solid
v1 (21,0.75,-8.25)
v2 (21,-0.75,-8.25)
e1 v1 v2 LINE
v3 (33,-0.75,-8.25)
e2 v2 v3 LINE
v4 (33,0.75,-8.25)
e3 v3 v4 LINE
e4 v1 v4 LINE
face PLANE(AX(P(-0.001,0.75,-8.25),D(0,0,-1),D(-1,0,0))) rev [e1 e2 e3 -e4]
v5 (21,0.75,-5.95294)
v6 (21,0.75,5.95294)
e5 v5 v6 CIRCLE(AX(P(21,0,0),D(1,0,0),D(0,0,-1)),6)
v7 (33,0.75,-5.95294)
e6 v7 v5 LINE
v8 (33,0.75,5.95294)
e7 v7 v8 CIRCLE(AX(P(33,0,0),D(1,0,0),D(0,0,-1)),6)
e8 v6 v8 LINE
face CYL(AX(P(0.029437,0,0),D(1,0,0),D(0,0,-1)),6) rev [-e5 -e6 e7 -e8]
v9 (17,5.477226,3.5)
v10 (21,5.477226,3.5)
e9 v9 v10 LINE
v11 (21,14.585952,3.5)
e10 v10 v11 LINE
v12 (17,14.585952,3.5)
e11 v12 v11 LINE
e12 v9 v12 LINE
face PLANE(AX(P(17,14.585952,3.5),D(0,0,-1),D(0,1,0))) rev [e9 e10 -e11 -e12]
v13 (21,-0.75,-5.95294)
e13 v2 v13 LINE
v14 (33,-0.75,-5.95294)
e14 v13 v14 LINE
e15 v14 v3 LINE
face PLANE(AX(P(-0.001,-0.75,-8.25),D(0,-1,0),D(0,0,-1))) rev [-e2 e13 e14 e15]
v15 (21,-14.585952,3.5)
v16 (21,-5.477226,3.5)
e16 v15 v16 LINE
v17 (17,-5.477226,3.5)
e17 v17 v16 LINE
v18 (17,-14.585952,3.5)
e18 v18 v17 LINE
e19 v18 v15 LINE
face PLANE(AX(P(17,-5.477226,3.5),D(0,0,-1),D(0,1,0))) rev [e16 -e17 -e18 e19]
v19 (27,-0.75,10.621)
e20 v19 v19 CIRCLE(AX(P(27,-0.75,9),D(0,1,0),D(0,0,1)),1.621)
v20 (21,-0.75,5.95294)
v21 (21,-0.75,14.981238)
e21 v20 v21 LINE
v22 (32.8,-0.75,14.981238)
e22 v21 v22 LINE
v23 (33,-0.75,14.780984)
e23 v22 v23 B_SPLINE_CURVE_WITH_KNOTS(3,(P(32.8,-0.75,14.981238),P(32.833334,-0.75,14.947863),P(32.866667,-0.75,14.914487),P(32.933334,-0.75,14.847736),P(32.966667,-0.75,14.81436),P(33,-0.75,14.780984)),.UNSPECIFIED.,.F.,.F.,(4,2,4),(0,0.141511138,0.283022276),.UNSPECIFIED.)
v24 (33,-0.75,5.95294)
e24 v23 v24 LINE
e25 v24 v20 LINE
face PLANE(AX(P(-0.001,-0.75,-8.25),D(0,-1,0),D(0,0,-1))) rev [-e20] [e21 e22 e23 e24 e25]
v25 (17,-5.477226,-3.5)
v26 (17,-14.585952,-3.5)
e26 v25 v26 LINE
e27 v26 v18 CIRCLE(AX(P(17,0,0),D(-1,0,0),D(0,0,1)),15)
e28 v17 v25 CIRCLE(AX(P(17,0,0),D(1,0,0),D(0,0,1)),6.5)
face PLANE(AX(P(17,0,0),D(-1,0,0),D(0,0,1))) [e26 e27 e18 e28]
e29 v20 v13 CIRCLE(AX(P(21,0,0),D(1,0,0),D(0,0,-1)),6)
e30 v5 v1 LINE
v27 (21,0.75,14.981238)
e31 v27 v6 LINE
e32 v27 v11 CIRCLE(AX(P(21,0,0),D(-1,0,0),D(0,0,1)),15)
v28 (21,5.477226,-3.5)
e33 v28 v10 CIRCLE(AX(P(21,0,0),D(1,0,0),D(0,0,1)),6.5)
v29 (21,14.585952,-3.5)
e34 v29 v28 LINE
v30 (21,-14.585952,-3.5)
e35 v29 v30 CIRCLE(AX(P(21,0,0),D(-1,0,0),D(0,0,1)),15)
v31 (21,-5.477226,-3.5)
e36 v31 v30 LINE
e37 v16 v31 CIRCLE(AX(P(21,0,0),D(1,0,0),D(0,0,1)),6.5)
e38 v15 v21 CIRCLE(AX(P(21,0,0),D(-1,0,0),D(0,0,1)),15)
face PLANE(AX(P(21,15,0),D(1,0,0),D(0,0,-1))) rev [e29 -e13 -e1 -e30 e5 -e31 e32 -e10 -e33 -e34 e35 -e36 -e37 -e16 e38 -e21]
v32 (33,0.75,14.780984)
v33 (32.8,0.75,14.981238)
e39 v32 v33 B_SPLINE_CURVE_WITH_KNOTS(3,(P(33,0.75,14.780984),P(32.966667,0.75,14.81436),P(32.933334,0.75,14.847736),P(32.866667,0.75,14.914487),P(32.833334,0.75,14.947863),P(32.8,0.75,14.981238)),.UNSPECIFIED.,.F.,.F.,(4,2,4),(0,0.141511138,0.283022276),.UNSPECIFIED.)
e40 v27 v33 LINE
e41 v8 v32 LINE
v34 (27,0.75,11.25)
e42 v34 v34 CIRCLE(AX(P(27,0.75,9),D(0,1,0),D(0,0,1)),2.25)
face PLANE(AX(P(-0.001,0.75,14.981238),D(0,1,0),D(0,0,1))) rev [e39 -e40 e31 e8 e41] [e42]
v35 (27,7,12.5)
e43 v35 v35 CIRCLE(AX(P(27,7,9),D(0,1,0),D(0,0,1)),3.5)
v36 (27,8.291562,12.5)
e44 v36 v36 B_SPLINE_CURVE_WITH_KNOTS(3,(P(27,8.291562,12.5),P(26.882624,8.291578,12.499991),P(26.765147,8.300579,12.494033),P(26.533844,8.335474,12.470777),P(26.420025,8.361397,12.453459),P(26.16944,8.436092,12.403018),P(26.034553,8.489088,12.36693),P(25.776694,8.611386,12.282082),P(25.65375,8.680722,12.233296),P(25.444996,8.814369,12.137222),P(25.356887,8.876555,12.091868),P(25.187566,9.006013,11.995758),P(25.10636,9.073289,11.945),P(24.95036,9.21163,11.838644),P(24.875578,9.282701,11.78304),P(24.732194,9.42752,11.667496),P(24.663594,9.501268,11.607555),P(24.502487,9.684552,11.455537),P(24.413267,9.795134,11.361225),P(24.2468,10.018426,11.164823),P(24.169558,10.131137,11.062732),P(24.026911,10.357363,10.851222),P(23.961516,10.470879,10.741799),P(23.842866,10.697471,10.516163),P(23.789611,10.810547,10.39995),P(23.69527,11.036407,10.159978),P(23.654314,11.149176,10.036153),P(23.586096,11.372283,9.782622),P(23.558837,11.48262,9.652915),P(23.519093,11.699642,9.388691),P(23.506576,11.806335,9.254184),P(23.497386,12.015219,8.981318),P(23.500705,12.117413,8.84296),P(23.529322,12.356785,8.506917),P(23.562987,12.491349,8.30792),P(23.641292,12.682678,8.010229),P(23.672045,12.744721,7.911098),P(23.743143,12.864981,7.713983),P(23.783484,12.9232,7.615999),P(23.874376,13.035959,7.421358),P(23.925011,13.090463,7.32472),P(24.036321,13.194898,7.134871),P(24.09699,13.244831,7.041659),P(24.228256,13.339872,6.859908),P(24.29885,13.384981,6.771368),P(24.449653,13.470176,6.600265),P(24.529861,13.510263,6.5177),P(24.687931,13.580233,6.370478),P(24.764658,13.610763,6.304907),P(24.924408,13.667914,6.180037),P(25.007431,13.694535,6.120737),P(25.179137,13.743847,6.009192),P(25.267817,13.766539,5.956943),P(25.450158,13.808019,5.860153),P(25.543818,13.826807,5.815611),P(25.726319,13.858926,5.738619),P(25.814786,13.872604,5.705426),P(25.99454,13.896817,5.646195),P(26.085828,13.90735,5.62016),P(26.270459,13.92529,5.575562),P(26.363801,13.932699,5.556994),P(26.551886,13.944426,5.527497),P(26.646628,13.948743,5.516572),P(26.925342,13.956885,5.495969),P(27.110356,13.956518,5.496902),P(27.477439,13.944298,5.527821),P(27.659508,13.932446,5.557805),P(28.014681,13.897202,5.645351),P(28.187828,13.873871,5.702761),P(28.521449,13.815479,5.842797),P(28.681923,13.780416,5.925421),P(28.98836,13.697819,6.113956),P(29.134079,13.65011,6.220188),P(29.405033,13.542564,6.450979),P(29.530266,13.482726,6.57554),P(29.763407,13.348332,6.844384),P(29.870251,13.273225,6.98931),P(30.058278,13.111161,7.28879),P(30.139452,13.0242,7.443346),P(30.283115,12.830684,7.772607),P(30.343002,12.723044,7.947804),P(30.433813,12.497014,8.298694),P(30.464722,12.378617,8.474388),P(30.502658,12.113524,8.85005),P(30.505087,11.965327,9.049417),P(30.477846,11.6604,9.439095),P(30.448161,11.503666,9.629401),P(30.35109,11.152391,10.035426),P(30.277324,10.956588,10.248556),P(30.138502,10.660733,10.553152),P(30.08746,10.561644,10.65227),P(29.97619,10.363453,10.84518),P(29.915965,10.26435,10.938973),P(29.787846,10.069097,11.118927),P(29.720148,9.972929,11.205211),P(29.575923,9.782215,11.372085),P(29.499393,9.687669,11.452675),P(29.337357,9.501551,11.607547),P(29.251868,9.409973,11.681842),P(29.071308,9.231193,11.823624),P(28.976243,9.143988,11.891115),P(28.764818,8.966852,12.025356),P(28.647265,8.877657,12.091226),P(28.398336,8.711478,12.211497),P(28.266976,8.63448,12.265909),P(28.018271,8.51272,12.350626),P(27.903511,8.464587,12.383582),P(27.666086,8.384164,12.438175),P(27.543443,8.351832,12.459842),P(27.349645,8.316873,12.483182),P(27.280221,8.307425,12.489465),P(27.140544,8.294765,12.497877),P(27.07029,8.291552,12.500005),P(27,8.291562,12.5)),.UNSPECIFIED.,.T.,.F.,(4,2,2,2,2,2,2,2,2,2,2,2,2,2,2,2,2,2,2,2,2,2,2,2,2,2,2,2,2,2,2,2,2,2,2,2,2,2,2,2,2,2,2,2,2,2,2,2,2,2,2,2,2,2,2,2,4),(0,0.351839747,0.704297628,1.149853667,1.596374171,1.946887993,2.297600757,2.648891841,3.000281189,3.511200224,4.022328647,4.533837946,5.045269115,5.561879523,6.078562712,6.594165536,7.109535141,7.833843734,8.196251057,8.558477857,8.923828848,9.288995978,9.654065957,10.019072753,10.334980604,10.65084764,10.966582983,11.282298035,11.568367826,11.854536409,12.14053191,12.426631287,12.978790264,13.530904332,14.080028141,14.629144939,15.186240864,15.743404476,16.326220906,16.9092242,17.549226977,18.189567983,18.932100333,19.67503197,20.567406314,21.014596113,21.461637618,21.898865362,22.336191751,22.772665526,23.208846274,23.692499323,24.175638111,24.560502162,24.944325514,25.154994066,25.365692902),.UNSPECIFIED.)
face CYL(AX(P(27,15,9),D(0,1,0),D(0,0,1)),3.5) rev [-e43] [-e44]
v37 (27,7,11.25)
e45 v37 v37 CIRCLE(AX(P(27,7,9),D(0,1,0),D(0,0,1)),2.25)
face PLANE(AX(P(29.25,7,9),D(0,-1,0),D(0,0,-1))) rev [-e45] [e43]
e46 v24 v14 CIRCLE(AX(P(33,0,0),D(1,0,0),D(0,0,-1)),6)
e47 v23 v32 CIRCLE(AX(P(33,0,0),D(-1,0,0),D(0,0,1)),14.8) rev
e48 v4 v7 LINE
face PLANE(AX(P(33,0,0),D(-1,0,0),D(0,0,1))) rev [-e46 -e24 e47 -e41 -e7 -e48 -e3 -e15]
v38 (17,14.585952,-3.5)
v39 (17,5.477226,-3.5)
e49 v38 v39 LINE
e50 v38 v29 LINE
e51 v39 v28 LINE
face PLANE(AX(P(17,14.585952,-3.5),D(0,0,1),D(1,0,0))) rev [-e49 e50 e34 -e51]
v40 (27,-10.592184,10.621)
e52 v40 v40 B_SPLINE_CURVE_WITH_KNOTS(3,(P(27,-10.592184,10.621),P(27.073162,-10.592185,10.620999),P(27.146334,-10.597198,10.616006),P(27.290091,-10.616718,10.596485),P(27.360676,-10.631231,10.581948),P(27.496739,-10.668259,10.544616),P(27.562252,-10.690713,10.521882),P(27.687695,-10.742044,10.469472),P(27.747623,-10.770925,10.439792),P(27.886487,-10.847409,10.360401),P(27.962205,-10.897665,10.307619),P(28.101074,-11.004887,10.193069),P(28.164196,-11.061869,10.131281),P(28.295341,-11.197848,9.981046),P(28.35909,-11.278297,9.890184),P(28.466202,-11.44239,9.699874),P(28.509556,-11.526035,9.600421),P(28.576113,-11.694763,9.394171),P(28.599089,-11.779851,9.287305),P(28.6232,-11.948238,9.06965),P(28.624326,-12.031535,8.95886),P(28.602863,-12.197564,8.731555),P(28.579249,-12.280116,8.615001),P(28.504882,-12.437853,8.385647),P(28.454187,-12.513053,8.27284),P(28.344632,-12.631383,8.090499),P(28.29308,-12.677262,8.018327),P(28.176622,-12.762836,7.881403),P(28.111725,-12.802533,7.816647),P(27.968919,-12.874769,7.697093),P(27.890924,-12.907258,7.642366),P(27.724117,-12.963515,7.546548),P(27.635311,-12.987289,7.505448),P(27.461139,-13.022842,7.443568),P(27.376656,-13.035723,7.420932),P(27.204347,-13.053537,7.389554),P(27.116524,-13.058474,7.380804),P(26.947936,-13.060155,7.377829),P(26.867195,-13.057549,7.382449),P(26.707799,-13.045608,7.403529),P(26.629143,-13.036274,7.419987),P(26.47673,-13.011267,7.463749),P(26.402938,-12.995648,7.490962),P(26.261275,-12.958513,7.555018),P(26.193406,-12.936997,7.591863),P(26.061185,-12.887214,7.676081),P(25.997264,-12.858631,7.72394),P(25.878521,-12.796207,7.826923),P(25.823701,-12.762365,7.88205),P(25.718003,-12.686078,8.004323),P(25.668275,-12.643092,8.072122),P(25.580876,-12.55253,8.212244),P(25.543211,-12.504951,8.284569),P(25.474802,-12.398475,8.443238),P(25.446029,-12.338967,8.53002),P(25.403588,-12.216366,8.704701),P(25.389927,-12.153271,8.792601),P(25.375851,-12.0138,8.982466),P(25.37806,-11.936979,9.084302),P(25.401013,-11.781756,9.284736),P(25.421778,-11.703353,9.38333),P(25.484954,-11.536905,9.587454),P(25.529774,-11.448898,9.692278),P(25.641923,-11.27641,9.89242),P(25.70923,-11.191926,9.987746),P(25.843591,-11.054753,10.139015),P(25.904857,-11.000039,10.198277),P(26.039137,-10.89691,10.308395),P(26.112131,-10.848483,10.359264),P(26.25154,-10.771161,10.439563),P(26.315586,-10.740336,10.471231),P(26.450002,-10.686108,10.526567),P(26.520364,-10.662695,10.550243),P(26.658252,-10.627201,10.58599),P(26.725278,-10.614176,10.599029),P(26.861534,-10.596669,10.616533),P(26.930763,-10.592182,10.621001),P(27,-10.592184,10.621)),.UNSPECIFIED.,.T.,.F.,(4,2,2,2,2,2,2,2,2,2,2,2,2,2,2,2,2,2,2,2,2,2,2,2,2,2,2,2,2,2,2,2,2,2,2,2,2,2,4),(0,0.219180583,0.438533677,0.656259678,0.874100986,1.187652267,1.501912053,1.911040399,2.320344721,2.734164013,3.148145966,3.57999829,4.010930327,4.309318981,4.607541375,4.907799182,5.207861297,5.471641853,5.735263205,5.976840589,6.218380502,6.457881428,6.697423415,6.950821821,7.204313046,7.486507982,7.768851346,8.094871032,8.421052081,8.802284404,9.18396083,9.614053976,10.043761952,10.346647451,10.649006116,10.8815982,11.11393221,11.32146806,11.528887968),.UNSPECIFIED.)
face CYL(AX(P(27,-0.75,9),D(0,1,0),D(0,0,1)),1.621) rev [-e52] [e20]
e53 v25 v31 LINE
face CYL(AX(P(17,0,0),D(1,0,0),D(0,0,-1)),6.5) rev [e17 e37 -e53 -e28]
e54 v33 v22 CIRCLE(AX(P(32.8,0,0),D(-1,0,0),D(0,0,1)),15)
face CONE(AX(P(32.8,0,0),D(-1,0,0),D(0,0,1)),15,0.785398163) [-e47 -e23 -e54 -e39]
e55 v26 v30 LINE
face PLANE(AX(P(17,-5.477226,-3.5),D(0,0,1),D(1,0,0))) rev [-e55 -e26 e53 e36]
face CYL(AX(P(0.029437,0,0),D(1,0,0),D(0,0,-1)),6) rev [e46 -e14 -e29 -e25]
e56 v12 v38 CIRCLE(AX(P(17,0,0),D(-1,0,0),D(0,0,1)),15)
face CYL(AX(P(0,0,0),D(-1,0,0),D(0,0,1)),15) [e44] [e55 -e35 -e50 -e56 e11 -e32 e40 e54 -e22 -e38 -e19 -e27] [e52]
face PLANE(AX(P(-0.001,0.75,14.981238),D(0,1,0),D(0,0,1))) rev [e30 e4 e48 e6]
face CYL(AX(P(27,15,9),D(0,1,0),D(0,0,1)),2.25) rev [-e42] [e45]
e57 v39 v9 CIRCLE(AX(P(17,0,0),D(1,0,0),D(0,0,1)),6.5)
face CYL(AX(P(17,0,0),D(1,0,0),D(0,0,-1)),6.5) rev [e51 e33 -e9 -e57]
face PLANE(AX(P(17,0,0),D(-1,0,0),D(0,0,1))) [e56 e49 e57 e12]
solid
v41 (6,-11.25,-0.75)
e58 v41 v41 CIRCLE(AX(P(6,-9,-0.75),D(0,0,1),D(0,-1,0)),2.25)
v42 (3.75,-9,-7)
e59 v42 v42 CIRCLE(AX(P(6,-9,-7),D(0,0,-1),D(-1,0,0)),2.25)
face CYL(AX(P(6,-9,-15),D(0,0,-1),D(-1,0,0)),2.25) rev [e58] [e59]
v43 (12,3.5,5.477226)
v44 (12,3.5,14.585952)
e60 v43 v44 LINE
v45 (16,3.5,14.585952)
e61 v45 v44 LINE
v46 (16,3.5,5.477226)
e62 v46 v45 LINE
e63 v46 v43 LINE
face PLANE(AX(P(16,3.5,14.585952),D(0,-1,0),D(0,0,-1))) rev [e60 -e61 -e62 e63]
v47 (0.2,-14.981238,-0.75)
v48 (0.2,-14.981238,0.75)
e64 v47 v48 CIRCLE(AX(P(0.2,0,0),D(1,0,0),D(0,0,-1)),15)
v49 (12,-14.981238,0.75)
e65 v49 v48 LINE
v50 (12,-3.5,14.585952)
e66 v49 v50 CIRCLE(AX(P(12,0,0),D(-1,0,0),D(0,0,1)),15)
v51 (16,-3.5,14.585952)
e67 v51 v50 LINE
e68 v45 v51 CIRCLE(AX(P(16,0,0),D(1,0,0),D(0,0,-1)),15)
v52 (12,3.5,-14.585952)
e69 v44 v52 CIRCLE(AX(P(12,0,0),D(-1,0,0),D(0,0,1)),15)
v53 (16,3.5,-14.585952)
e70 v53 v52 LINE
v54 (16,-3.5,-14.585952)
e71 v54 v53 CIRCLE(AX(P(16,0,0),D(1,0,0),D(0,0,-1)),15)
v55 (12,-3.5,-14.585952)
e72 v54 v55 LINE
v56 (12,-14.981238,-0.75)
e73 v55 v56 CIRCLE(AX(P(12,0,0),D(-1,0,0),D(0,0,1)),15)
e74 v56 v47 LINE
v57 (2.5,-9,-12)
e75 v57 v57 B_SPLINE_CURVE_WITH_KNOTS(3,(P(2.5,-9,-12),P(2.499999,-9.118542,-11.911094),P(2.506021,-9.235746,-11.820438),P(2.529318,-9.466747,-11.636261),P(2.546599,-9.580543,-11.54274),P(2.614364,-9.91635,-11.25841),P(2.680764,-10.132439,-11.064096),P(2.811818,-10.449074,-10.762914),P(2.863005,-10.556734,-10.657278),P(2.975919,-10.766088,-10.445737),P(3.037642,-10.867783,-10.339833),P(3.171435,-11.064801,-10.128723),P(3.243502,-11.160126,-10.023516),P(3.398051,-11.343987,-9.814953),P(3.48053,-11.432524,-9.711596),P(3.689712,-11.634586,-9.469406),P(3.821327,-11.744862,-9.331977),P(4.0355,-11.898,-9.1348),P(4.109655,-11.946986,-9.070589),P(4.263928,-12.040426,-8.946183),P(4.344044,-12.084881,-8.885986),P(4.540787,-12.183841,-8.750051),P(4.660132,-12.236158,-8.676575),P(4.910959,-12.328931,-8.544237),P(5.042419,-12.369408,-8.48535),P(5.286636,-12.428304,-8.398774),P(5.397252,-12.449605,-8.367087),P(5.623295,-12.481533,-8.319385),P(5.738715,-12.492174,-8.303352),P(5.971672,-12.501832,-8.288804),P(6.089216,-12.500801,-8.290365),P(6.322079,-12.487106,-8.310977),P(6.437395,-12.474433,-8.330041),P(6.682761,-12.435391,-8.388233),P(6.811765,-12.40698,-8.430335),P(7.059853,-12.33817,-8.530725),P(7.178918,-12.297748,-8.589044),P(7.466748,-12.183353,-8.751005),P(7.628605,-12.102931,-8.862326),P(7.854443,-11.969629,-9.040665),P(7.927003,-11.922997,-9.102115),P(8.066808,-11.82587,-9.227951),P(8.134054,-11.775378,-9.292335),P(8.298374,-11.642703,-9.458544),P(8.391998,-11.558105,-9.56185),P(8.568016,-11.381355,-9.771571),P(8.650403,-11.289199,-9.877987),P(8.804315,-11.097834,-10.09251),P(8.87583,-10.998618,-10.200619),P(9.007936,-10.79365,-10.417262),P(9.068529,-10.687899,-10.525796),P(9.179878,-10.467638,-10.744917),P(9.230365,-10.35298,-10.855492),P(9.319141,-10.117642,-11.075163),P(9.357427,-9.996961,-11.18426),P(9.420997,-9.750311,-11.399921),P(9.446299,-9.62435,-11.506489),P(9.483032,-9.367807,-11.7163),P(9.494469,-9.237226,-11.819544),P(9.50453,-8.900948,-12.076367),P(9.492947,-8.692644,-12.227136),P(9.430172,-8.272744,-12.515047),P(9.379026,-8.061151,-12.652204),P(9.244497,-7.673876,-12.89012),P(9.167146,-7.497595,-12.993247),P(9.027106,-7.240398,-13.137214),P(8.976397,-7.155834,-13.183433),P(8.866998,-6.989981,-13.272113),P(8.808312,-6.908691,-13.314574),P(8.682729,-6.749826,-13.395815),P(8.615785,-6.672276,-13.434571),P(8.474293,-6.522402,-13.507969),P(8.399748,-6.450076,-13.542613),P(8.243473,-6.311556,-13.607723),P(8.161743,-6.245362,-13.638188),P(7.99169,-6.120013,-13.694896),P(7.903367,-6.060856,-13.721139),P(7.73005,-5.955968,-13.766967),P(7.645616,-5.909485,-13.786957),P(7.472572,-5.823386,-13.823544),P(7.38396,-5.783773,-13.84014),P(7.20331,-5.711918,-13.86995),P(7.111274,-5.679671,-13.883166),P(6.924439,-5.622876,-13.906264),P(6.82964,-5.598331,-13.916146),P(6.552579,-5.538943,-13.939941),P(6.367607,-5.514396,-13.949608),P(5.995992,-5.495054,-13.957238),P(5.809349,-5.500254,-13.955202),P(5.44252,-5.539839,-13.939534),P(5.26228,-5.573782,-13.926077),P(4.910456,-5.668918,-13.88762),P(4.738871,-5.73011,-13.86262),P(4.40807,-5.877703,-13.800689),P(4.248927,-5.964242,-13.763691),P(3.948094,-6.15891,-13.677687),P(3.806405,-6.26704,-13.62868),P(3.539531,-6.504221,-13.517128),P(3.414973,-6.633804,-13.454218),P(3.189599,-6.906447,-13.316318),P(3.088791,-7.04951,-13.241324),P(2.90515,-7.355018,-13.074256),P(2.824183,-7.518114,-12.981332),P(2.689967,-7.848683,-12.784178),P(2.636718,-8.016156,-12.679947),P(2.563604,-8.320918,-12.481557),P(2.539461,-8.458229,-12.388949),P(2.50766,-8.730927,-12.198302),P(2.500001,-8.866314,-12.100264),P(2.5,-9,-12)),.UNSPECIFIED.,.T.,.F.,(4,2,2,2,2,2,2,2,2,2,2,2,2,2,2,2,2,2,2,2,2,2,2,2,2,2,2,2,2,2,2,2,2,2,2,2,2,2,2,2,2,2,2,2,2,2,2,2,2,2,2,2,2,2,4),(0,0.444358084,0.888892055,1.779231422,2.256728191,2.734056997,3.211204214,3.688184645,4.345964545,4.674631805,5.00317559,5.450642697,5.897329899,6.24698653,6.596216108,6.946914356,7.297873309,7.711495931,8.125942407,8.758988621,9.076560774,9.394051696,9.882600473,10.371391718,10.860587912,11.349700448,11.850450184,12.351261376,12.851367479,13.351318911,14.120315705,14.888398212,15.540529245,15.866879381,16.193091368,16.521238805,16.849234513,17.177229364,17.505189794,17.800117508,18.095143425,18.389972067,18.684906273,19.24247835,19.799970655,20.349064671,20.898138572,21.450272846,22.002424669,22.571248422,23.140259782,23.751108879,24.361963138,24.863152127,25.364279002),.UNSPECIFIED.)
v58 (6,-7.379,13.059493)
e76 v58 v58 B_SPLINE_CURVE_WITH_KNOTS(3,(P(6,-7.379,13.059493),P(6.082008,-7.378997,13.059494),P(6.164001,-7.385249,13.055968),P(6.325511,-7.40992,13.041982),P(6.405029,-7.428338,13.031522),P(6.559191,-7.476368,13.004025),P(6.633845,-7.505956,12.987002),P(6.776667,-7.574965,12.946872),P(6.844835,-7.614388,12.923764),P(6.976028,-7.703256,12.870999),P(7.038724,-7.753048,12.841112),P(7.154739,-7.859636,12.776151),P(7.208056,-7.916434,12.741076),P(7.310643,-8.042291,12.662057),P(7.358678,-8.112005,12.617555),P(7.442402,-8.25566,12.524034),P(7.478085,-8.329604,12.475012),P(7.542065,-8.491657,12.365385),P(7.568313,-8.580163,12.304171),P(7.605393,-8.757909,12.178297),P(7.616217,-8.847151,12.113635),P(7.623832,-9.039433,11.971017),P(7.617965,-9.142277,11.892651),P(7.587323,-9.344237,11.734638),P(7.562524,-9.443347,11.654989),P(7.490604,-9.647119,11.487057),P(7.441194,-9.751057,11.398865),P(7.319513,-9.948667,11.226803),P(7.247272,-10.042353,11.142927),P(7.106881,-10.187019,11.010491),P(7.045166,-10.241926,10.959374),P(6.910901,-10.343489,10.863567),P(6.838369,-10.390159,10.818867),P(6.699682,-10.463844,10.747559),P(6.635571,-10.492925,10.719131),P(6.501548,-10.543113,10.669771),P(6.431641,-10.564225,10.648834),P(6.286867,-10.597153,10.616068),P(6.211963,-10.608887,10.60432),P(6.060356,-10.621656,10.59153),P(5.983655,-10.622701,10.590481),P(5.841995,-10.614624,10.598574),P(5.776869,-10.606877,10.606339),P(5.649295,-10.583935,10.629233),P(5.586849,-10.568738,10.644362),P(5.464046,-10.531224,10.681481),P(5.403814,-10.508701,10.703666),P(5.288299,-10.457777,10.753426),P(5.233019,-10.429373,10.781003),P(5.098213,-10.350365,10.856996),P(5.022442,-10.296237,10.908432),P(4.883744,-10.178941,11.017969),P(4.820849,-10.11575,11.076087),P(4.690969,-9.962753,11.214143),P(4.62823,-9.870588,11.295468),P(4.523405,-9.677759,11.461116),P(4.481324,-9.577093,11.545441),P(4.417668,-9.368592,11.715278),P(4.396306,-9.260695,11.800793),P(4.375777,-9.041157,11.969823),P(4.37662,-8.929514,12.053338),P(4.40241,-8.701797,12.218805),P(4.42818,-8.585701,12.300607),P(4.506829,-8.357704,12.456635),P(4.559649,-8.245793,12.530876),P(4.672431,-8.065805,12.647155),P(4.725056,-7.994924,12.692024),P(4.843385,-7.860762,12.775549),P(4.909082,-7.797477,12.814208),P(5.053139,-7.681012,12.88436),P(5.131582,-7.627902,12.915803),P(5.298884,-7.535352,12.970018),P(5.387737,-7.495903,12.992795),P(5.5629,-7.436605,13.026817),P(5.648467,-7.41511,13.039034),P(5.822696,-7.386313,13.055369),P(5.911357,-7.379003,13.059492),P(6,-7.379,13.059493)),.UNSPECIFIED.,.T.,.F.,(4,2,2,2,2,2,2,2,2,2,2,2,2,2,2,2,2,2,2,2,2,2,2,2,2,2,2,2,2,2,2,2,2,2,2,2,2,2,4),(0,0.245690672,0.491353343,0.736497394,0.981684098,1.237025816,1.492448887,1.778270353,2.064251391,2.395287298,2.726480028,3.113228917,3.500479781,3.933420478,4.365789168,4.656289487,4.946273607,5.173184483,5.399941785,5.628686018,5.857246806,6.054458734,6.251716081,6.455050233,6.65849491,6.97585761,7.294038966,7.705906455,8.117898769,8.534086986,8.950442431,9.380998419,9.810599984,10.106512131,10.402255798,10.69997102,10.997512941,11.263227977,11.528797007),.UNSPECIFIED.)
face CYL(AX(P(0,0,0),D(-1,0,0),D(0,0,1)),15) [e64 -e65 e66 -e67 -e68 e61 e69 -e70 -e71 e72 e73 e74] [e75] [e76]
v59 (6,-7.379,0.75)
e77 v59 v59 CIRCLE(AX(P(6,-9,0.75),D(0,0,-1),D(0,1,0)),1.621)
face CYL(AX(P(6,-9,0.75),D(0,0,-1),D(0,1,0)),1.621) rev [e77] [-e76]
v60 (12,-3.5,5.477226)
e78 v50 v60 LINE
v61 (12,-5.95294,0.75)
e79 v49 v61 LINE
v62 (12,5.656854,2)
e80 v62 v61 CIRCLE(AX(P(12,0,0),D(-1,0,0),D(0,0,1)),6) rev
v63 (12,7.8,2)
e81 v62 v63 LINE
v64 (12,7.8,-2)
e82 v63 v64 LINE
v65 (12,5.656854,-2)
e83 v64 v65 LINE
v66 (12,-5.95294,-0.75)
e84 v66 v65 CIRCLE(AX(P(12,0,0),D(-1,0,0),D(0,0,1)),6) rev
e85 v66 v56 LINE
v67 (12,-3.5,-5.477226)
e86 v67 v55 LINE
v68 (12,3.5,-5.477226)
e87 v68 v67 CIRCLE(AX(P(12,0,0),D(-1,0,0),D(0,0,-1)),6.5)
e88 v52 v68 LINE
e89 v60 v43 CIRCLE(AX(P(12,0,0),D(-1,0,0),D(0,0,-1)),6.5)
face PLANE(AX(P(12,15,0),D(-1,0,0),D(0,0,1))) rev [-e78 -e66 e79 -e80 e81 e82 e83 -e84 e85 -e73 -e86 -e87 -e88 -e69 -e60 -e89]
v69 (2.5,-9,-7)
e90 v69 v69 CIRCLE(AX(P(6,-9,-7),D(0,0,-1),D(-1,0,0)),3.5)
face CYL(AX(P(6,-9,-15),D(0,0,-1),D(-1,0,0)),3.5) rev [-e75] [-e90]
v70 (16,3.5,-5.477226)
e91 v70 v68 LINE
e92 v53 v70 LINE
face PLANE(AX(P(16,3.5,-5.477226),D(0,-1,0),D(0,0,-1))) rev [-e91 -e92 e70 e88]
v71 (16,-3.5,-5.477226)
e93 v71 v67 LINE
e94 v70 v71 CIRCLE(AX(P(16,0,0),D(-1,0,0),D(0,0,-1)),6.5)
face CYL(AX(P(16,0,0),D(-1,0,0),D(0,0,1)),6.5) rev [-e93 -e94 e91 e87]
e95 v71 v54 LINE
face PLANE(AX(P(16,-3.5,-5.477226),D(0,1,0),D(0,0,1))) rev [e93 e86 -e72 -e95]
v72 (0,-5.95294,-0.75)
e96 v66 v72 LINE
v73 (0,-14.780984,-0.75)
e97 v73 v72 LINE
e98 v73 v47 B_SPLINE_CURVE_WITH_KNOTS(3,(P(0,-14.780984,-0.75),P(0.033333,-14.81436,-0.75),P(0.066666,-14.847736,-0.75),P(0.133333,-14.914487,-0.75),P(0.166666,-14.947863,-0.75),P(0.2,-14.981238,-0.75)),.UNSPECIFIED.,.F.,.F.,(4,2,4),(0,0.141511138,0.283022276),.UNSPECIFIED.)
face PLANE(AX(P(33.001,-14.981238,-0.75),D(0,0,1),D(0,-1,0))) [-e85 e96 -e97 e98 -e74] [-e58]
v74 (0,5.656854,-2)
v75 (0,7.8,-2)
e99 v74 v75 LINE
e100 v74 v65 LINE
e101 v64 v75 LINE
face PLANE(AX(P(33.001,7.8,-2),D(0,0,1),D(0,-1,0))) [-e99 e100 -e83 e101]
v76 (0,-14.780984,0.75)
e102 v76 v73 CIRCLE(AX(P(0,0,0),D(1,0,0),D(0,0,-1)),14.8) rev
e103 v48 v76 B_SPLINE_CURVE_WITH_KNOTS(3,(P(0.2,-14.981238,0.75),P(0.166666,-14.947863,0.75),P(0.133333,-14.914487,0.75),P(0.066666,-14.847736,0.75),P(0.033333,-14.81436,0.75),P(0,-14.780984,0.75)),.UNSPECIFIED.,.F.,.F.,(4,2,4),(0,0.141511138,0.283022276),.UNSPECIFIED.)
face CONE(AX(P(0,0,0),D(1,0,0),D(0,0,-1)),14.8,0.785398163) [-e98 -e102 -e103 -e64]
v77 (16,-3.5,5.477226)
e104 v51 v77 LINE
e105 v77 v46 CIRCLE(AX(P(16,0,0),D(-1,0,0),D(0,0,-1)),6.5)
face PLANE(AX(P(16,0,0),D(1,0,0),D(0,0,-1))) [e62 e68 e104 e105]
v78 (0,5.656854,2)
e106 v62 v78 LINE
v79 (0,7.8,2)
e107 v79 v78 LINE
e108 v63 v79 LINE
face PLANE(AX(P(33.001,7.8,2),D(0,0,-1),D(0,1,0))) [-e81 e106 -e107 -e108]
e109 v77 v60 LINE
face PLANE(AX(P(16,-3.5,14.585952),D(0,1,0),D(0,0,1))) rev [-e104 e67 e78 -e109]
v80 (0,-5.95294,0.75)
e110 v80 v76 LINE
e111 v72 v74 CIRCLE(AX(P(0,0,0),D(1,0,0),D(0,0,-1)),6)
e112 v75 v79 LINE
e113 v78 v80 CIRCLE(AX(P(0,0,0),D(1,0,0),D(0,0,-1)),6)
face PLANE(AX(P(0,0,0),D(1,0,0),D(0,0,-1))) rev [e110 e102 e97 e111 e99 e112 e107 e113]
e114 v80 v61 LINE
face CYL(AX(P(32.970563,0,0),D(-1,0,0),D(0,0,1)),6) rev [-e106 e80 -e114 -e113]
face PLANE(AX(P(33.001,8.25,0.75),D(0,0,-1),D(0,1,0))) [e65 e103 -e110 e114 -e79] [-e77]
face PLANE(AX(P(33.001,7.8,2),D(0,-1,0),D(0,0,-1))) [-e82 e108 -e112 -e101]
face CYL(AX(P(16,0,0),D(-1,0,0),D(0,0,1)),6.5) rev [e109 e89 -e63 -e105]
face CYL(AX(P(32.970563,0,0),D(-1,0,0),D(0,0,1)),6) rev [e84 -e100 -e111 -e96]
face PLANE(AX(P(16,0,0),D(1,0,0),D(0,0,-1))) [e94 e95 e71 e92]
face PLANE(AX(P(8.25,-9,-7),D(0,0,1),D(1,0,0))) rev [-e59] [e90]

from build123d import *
from build123d.topology import SkipClean

# Parameters (mm, degrees)
SKETCH1_W                          = 12
SKETCH1_H                          = 15
BOSS_EXTRUDE1_DEPTH                = 4
BOSS_EXTRUDE2_START                = 4
BOSS_EXTRUDE2_DEPTH                = 4
SKETCH4_R                          = 6
CUT_EXTRUDE1_DEPTH                 = 16
CUT_EXTRUDE2_START                 = -16
SKETCH5_R                          = 6
CUT_EXTRUDE2_DEPTH                 = 16
CUT_EXTRUDE3_DEPTH                 = 12
CUT_EXTRUDE4_START                 = -12
CUT_EXTRUDE4_DEPTH                 = 12
SOCKET_HEAD_CAP_SCREW1_D           = 4.5
SOCKET_HEAD_CAP_SCREW1_DEPTH       = 14.25
SOCKET_HEAD_CAP_SCREW1_CBORE_D     = 7
SOCKET_HEAD_CAP_SCREW1_CBORE_DEPTH = 8
TAP1_D                             = 3.242
SOCKET_HEAD_CAP_SCREW2_D           = 4.5
SOCKET_HEAD_CAP_SCREW2_DEPTH       = 14.25
SOCKET_HEAD_CAP_SCREW2_CBORE_D     = 7
SOCKET_HEAD_CAP_SCREW2_CBORE_DEPTH = 8
TAP2_D                             = 3.242
CHAMFER1_SIZE                      = 0.2
CHAMFER2_SIZE                      = 0.2
DELETEFACE1_DEPTH                  = 12
CUT_EXTRUDE5_REACH                 = 41.23
SKETCH16_W                         = 4
SKETCH16_H                         = 7.8


# Read off the part's stored shape, not the designer's step: DeleteFace1
with BuildPart() as part:
    # Sketch1 → Revolve1 (revolve)
    with BuildSketch(Plane.XY, mode=Mode.PRIVATE) as revolve1_sk:
        with Locations((6, 7.5)):
            Rectangle(SKETCH1_W, SKETCH1_H)
        with Locations((27, 7.5)):
            Rectangle(SKETCH1_W, SKETCH1_H)
    revolve(revolve1_sk.sketch.rotate(Axis((0, 0, 0), (1, 0, 0)), 90), axis=Axis((0, 0, 0), (1, 0, 0)))

    # Sketch2 → Boss-Extrude1 (add)
    with SkipClean():  # the faces are left unmerged after this step: merging them gives an invalid solid
        with BuildSketch(Plane(origin=(12, 0, 0), x_dir=(0, 0, -1), z_dir=(1, 0, 0))):
            with BuildLine():
                Line((-14.585952146, 3.5), (-5.477225575, 3.5))
                ThreePointArc((-5.477225575, 3.5), (-6.5, 0), (-5.477225575, -3.5))
                Line((-5.477225575, -3.5), (-14.585952146, -3.5))
                ThreePointArc((-14.585952146, -3.5), (-15, 0), (-14.585952146, 3.5))
            make_face()
            with BuildLine():
                Line((5.477225575, 3.5), (14.585952146, 3.5))
                ThreePointArc((14.585952146, 3.5), (15, 0), (14.585952146, -3.5))
                Line((14.585952146, -3.5), (5.477225575, -3.5))
                ThreePointArc((5.477225575, -3.5), (6.5, 0), (5.477225575, 3.5))
            make_face()
        extrude(amount=BOSS_EXTRUDE1_DEPTH)

    # Sketch3 → Boss-Extrude2 (add)
    with SkipClean():  # the faces are left unmerged after this step: merging them gives an invalid solid
        with BuildSketch(Plane.ZY.offset(-21).offset(BOSS_EXTRUDE2_START)):
            with BuildLine():
                Line((-3.5, 14.585952146), (-3.5, 5.477225575))
                ThreePointArc((-3.5, 5.477225575), (0, 6.5), (3.5, 5.477225575))
                Line((3.5, 5.477225575), (3.5, 14.585952146))
                ThreePointArc((3.5, 14.585952146), (0, 15), (-3.5, 14.585952146))
            make_face()
            with BuildLine():
                Line((3.5, -5.477225575), (3.5, -14.585952146))
                ThreePointArc((3.5, -14.585952146), (0, -15), (-3.5, -14.585952146))
                Line((-3.5, -14.585952146), (-3.5, -5.477225575))
                ThreePointArc((-3.5, -5.477225575), (0, -6.5), (3.5, -5.477225575))
            make_face()
        extrude(amount=-BOSS_EXTRUDE2_DEPTH)

    # Sketch4 → Cut-Extrude1 (cut)
    with SkipClean():  # the faces are left unmerged after this step: merging them gives an invalid solid
        with BuildSketch(Plane(origin=(0, 0, 0), x_dir=(0, 0, -1), z_dir=(1, 0, 0))):
            with Locations(Location((0, 0, 0), (0, 0, 180))):
                Circle(SKETCH4_R)
        extrude(amount=CUT_EXTRUDE1_DEPTH, mode=Mode.SUBTRACT)

    # Sketch5 → Cut-Extrude2 (cut)
    with SkipClean():  # the faces are left unmerged after this step: merging them gives an invalid solid
        with BuildSketch(Plane(origin=(33, 0, 0), x_dir=(0, 0, -1), z_dir=(1, 0, 0)).offset(CUT_EXTRUDE2_START)):
            Circle(SKETCH5_R)
        extrude(amount=CUT_EXTRUDE2_DEPTH, mode=Mode.SUBTRACT)

    # Sketch6 → Cut-Extrude3 (cut)
    with SkipClean():  # the faces are left unmerged after this step: merging them gives an invalid solid
        with BuildSketch(Plane(origin=(0, 0, 0), x_dir=(0, 0, -1), z_dir=(1, 0, 0))):
            with BuildLine():
                Line((0.75, -14.981238267), (0.75, 8.25))
                Line((0.75, 8.25), (-0.75, 8.25))
                Line((-0.75, 8.25), (-0.75, -14.981238267))
                ThreePointArc((-0.75, -14.981238267), (0, -15), (0.75, -14.981238267))
            make_face()
        extrude(amount=CUT_EXTRUDE3_DEPTH, mode=Mode.SUBTRACT)

    # Sketch7 → Cut-Extrude4 (cut)
    with SkipClean():  # the faces are left unmerged after this step: merging them gives an invalid solid
        with BuildSketch(Plane(origin=(33, 0, 0), x_dir=(0, 0, -1), z_dir=(1, 0, 0)).offset(CUT_EXTRUDE4_START)):
            with BuildLine():
                Line((-14.981238267, 0.75), (8.25, 0.75))
                Line((8.25, 0.75), (8.25, -0.75))
                Line((8.25, -0.75), (-14.981238267, -0.75))
                ThreePointArc((-14.981238267, -0.75), (-15, 0), (-14.981238267, 0.75))
            make_face()
        extrude(amount=CUT_EXTRUDE4_DEPTH, mode=Mode.SUBTRACT)

    # Socket Head Cap Screw1
    with Locations(Plane(origin=(0, 0, -15), x_dir=(1, 0, 0), z_dir=(0, 0, -1))):
        with Locations((6, 9)):
            CounterBoreHole(SOCKET_HEAD_CAP_SCREW1_D / 2, SOCKET_HEAD_CAP_SCREW1_CBORE_D / 2, SOCKET_HEAD_CAP_SCREW1_CBORE_DEPTH, depth=SOCKET_HEAD_CAP_SCREW1_DEPTH)

    # Tap1 (through all)
    with Locations(Plane(origin=(0, 0, 0.75), x_dir=(-1, 0, 0), z_dir=(0, 0, -1))):
        with Locations((-6, -9)):
            Hole(TAP1_D / 2)

    # Socket Head Cap Screw2
    with Locations(Plane(origin=(0, 15, 0), x_dir=(1, 0, 0), z_dir=(0, 1, 0))):
        with Locations((27, -9)):
            CounterBoreHole(SOCKET_HEAD_CAP_SCREW2_D / 2, SOCKET_HEAD_CAP_SCREW2_CBORE_D / 2, SOCKET_HEAD_CAP_SCREW2_CBORE_DEPTH, depth=SOCKET_HEAD_CAP_SCREW2_DEPTH)

    # Tap2 (through all)
    with Locations(Plane(origin=(0, -0.75, 0), x_dir=(1, 0, 0), z_dir=(0, 1, 0))):
        with Locations((27, -9)):
            Hole(TAP2_D / 2)

    # Chamfer1
    chamfer1_edges = [part.edges().sort_by_distance(p)[0] for p in [
        (0, 10.86853256, -10.338036564),
    ]]
    chamfer(chamfer1_edges, length=CHAMFER1_SIZE)

    # Chamfer2
    chamfer2_edges = [part.edges().sort_by_distance(p)[0] for p in [
        (33, 0, -15),
    ]]
    chamfer(chamfer2_edges, length=CHAMFER2_SIZE)

    # DeleteFace1 outline → DeleteFace1 (add)
    with SkipClean():  # the faces are left unmerged after this step: merging them gives an invalid solid
        with BuildSketch(Plane.YZ):
            with BuildLine():
                Line((8.25, 0.75), (5.95294045, 0.75))
                ThreePointArc((5.95294045, 0.75), (6, 0), (5.95294045, -0.75))
                Line((5.95294045, -0.75), (8.25, -0.75))
                Line((8.25, -0.75), (8.25, 0.75))
            make_face()
        extrude(amount=DELETEFACE1_DEPTH)

    # Sketch16 → Cut-Extrude5 (cut, up to next)
    with BuildSketch(Plane(origin=(0, 0, 0), x_dir=(0, 0, -1), z_dir=(1, 0, 0)), mode=Mode.PRIVATE) as cut_extrude5_sk1:
        with Locations((0, 3.9)):
            Rectangle(SKETCH16_W, SKETCH16_H)
    cut_extrude5_tool1 = extrude(cut_extrude5_sk1.sketch, amount=CUT_EXTRUDE5_REACH, mode=Mode.PRIVATE) & part.part
    add(cut_extrude5_tool1.solids().sort_by_distance((0, 3.9, 0))[0], mode=Mode.SUBTRACT)


solid = part.part
